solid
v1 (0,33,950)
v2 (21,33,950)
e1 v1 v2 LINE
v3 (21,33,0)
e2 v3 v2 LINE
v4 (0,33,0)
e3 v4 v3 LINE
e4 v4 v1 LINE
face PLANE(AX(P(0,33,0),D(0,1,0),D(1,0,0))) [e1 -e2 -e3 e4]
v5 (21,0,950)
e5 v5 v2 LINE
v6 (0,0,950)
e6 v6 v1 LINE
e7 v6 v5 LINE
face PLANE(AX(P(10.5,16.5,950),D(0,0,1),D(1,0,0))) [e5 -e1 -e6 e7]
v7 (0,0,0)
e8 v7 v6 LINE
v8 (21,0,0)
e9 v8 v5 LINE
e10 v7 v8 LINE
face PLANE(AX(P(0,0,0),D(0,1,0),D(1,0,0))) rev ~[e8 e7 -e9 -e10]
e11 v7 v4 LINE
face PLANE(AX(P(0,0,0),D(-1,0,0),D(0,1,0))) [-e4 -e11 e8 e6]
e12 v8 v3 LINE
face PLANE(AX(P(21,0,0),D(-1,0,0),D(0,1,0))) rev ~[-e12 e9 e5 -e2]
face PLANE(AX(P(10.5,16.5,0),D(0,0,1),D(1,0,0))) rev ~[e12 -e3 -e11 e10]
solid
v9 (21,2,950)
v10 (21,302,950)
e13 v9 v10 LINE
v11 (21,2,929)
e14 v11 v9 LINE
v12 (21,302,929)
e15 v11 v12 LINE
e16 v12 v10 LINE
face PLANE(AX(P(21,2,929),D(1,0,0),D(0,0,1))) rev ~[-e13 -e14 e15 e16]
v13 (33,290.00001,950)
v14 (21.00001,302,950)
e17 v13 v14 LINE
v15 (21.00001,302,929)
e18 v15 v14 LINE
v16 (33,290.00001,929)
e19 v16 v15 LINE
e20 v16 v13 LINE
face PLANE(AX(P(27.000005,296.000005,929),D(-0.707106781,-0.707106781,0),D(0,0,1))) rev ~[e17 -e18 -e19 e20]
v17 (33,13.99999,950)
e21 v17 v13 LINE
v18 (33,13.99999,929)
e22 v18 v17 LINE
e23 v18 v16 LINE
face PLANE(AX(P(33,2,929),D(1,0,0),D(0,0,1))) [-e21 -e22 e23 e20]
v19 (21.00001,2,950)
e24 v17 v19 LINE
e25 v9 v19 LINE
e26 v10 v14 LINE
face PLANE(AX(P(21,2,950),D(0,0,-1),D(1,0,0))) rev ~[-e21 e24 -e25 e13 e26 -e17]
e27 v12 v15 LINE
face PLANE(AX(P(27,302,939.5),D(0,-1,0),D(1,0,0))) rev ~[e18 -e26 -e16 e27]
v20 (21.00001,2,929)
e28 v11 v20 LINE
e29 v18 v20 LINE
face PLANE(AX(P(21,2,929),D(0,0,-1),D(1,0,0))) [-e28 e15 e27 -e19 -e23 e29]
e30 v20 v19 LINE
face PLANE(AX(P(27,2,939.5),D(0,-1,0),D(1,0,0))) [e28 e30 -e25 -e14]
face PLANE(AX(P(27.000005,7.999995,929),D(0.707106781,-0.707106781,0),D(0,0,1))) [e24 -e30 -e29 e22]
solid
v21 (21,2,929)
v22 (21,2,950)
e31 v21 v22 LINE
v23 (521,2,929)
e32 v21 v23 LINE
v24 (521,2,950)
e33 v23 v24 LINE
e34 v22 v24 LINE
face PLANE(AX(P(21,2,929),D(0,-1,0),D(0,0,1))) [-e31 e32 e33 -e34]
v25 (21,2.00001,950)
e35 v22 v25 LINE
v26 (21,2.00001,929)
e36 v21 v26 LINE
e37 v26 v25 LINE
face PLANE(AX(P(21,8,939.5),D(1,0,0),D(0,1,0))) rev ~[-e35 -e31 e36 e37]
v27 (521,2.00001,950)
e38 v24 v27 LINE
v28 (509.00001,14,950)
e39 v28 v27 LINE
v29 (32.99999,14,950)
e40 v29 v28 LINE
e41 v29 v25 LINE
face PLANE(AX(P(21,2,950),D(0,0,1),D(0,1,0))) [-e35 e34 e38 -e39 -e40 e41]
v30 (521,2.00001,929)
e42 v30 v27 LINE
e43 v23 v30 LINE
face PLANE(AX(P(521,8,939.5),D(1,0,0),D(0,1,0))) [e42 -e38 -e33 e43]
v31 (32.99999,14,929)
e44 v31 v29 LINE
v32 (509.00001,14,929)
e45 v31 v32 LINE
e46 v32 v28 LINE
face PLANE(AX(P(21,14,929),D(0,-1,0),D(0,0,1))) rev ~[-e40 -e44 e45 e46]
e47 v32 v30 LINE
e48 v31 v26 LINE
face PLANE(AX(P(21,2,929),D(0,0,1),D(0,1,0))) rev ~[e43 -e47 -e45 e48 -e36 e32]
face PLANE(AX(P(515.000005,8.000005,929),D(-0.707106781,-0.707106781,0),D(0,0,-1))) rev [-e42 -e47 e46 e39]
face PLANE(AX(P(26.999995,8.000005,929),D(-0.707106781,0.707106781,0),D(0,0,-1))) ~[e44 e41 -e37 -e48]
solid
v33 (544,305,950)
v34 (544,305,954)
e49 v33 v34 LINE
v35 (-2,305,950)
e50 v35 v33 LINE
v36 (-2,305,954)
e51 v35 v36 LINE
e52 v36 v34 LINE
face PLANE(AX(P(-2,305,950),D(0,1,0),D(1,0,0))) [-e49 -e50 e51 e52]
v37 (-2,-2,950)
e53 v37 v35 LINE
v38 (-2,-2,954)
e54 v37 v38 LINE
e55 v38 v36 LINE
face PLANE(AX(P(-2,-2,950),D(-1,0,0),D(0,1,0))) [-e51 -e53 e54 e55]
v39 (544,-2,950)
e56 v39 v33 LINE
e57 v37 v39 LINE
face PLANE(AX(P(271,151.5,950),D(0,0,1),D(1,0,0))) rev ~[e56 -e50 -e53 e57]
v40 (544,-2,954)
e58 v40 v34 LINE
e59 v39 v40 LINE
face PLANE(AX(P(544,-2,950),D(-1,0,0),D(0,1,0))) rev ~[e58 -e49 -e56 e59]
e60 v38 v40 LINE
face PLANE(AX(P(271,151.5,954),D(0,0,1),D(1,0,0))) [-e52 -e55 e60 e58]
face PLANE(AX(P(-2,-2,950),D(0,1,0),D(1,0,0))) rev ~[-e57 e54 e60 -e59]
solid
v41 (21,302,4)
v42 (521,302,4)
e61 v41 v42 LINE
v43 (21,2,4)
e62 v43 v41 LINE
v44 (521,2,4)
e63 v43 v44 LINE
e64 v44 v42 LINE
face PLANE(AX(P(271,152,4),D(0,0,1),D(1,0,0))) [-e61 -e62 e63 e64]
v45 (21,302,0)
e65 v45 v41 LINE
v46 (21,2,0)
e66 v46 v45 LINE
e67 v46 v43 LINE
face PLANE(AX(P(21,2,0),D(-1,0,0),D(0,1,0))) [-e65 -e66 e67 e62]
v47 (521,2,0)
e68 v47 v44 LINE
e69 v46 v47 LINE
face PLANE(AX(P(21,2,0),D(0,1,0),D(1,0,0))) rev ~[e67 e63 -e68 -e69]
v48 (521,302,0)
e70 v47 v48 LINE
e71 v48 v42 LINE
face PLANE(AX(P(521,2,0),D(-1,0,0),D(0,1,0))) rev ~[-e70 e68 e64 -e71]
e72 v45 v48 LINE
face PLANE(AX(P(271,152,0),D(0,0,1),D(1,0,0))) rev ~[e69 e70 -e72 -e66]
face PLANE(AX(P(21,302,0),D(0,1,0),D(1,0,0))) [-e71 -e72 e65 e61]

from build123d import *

# Parameters (mm, degrees)
F0_W      = 21
F0_H      = 33
F1_DEPTH  = 950
F3_W      = 12
F3_H      = 21
F4_DEPTH  = 300
F5_SIZE   = 11.99999
F6_W      = 12
F6_H      = 21
F7_DEPTH  = 500
F8_SIZE   = 11.99999
F9_W      = 546
F9_H      = 307
F10_DEPTH = 4
F11_W     = 500
F11_H     = 300
F12_DEPTH = 4


# Not quite as in the source:
# - a fillet or chamfer is up to 0.001 mm smaller than in the source, because OpenCascade refuses the exact size


with BuildPart() as f1:
    # F0 (on Top) → F1 (new body)
    with BuildSketch(Plane.XY):
        with Locations((10.5, 16.5)):
            Rectangle(F0_W, F0_H)
    extrude(amount=F1_DEPTH)


with BuildPart() as f4:
    # F3 (on offset) → F4 (new body)
    with BuildSketch(Plane.XZ.offset(-2)):
        with Locations((27, 939.5)):
            Rectangle(F3_W, F3_H)
    extrude(amount=-F4_DEPTH)

    # F5 (size 12 in the source; OpenCascade refuses exactly that, so slightly less here)
    f5_edges = [f4.edges().sort_by_distance(p)[0] for p in [
        (33, 2, 939.5),
        (33, 302, 939.5),
    ]]
    chamfer(f5_edges, length=F5_SIZE)


with BuildPart() as f7:
    # F6 (on face) → F7 (new body)
    with BuildSketch(Plane.YZ.offset(21)):
        with Locations((8, 939.5)):
            Rectangle(F6_W, F6_H)
    extrude(amount=F7_DEPTH)

    # F8 (size 12 in the source; OpenCascade refuses exactly that, so slightly less here)
    f8_edges = [f7.edges().sort_by_distance(p)[0] for p in [
        (21, 14, 939.5),
        (521, 14, 939.5),
    ]]
    chamfer(f8_edges, length=F8_SIZE)


with BuildPart() as f10:
    # F9 (on face) → F10 (new body)
    with BuildSketch(Plane.XY.offset(950)):
        with Locations((271, 151.5)):
            Rectangle(F9_W, F9_H)
    extrude(amount=F10_DEPTH)


with BuildPart() as f12:
    # F11 (on Top) → F12 (new body)
    with BuildSketch(Plane.XY):
        with Locations((271, 152)):
            Rectangle(F11_W, F11_H)
    extrude(amount=F12_DEPTH)


solid = Compound([f1.part, f4.part, f7.part, f10.part, f12.part])
